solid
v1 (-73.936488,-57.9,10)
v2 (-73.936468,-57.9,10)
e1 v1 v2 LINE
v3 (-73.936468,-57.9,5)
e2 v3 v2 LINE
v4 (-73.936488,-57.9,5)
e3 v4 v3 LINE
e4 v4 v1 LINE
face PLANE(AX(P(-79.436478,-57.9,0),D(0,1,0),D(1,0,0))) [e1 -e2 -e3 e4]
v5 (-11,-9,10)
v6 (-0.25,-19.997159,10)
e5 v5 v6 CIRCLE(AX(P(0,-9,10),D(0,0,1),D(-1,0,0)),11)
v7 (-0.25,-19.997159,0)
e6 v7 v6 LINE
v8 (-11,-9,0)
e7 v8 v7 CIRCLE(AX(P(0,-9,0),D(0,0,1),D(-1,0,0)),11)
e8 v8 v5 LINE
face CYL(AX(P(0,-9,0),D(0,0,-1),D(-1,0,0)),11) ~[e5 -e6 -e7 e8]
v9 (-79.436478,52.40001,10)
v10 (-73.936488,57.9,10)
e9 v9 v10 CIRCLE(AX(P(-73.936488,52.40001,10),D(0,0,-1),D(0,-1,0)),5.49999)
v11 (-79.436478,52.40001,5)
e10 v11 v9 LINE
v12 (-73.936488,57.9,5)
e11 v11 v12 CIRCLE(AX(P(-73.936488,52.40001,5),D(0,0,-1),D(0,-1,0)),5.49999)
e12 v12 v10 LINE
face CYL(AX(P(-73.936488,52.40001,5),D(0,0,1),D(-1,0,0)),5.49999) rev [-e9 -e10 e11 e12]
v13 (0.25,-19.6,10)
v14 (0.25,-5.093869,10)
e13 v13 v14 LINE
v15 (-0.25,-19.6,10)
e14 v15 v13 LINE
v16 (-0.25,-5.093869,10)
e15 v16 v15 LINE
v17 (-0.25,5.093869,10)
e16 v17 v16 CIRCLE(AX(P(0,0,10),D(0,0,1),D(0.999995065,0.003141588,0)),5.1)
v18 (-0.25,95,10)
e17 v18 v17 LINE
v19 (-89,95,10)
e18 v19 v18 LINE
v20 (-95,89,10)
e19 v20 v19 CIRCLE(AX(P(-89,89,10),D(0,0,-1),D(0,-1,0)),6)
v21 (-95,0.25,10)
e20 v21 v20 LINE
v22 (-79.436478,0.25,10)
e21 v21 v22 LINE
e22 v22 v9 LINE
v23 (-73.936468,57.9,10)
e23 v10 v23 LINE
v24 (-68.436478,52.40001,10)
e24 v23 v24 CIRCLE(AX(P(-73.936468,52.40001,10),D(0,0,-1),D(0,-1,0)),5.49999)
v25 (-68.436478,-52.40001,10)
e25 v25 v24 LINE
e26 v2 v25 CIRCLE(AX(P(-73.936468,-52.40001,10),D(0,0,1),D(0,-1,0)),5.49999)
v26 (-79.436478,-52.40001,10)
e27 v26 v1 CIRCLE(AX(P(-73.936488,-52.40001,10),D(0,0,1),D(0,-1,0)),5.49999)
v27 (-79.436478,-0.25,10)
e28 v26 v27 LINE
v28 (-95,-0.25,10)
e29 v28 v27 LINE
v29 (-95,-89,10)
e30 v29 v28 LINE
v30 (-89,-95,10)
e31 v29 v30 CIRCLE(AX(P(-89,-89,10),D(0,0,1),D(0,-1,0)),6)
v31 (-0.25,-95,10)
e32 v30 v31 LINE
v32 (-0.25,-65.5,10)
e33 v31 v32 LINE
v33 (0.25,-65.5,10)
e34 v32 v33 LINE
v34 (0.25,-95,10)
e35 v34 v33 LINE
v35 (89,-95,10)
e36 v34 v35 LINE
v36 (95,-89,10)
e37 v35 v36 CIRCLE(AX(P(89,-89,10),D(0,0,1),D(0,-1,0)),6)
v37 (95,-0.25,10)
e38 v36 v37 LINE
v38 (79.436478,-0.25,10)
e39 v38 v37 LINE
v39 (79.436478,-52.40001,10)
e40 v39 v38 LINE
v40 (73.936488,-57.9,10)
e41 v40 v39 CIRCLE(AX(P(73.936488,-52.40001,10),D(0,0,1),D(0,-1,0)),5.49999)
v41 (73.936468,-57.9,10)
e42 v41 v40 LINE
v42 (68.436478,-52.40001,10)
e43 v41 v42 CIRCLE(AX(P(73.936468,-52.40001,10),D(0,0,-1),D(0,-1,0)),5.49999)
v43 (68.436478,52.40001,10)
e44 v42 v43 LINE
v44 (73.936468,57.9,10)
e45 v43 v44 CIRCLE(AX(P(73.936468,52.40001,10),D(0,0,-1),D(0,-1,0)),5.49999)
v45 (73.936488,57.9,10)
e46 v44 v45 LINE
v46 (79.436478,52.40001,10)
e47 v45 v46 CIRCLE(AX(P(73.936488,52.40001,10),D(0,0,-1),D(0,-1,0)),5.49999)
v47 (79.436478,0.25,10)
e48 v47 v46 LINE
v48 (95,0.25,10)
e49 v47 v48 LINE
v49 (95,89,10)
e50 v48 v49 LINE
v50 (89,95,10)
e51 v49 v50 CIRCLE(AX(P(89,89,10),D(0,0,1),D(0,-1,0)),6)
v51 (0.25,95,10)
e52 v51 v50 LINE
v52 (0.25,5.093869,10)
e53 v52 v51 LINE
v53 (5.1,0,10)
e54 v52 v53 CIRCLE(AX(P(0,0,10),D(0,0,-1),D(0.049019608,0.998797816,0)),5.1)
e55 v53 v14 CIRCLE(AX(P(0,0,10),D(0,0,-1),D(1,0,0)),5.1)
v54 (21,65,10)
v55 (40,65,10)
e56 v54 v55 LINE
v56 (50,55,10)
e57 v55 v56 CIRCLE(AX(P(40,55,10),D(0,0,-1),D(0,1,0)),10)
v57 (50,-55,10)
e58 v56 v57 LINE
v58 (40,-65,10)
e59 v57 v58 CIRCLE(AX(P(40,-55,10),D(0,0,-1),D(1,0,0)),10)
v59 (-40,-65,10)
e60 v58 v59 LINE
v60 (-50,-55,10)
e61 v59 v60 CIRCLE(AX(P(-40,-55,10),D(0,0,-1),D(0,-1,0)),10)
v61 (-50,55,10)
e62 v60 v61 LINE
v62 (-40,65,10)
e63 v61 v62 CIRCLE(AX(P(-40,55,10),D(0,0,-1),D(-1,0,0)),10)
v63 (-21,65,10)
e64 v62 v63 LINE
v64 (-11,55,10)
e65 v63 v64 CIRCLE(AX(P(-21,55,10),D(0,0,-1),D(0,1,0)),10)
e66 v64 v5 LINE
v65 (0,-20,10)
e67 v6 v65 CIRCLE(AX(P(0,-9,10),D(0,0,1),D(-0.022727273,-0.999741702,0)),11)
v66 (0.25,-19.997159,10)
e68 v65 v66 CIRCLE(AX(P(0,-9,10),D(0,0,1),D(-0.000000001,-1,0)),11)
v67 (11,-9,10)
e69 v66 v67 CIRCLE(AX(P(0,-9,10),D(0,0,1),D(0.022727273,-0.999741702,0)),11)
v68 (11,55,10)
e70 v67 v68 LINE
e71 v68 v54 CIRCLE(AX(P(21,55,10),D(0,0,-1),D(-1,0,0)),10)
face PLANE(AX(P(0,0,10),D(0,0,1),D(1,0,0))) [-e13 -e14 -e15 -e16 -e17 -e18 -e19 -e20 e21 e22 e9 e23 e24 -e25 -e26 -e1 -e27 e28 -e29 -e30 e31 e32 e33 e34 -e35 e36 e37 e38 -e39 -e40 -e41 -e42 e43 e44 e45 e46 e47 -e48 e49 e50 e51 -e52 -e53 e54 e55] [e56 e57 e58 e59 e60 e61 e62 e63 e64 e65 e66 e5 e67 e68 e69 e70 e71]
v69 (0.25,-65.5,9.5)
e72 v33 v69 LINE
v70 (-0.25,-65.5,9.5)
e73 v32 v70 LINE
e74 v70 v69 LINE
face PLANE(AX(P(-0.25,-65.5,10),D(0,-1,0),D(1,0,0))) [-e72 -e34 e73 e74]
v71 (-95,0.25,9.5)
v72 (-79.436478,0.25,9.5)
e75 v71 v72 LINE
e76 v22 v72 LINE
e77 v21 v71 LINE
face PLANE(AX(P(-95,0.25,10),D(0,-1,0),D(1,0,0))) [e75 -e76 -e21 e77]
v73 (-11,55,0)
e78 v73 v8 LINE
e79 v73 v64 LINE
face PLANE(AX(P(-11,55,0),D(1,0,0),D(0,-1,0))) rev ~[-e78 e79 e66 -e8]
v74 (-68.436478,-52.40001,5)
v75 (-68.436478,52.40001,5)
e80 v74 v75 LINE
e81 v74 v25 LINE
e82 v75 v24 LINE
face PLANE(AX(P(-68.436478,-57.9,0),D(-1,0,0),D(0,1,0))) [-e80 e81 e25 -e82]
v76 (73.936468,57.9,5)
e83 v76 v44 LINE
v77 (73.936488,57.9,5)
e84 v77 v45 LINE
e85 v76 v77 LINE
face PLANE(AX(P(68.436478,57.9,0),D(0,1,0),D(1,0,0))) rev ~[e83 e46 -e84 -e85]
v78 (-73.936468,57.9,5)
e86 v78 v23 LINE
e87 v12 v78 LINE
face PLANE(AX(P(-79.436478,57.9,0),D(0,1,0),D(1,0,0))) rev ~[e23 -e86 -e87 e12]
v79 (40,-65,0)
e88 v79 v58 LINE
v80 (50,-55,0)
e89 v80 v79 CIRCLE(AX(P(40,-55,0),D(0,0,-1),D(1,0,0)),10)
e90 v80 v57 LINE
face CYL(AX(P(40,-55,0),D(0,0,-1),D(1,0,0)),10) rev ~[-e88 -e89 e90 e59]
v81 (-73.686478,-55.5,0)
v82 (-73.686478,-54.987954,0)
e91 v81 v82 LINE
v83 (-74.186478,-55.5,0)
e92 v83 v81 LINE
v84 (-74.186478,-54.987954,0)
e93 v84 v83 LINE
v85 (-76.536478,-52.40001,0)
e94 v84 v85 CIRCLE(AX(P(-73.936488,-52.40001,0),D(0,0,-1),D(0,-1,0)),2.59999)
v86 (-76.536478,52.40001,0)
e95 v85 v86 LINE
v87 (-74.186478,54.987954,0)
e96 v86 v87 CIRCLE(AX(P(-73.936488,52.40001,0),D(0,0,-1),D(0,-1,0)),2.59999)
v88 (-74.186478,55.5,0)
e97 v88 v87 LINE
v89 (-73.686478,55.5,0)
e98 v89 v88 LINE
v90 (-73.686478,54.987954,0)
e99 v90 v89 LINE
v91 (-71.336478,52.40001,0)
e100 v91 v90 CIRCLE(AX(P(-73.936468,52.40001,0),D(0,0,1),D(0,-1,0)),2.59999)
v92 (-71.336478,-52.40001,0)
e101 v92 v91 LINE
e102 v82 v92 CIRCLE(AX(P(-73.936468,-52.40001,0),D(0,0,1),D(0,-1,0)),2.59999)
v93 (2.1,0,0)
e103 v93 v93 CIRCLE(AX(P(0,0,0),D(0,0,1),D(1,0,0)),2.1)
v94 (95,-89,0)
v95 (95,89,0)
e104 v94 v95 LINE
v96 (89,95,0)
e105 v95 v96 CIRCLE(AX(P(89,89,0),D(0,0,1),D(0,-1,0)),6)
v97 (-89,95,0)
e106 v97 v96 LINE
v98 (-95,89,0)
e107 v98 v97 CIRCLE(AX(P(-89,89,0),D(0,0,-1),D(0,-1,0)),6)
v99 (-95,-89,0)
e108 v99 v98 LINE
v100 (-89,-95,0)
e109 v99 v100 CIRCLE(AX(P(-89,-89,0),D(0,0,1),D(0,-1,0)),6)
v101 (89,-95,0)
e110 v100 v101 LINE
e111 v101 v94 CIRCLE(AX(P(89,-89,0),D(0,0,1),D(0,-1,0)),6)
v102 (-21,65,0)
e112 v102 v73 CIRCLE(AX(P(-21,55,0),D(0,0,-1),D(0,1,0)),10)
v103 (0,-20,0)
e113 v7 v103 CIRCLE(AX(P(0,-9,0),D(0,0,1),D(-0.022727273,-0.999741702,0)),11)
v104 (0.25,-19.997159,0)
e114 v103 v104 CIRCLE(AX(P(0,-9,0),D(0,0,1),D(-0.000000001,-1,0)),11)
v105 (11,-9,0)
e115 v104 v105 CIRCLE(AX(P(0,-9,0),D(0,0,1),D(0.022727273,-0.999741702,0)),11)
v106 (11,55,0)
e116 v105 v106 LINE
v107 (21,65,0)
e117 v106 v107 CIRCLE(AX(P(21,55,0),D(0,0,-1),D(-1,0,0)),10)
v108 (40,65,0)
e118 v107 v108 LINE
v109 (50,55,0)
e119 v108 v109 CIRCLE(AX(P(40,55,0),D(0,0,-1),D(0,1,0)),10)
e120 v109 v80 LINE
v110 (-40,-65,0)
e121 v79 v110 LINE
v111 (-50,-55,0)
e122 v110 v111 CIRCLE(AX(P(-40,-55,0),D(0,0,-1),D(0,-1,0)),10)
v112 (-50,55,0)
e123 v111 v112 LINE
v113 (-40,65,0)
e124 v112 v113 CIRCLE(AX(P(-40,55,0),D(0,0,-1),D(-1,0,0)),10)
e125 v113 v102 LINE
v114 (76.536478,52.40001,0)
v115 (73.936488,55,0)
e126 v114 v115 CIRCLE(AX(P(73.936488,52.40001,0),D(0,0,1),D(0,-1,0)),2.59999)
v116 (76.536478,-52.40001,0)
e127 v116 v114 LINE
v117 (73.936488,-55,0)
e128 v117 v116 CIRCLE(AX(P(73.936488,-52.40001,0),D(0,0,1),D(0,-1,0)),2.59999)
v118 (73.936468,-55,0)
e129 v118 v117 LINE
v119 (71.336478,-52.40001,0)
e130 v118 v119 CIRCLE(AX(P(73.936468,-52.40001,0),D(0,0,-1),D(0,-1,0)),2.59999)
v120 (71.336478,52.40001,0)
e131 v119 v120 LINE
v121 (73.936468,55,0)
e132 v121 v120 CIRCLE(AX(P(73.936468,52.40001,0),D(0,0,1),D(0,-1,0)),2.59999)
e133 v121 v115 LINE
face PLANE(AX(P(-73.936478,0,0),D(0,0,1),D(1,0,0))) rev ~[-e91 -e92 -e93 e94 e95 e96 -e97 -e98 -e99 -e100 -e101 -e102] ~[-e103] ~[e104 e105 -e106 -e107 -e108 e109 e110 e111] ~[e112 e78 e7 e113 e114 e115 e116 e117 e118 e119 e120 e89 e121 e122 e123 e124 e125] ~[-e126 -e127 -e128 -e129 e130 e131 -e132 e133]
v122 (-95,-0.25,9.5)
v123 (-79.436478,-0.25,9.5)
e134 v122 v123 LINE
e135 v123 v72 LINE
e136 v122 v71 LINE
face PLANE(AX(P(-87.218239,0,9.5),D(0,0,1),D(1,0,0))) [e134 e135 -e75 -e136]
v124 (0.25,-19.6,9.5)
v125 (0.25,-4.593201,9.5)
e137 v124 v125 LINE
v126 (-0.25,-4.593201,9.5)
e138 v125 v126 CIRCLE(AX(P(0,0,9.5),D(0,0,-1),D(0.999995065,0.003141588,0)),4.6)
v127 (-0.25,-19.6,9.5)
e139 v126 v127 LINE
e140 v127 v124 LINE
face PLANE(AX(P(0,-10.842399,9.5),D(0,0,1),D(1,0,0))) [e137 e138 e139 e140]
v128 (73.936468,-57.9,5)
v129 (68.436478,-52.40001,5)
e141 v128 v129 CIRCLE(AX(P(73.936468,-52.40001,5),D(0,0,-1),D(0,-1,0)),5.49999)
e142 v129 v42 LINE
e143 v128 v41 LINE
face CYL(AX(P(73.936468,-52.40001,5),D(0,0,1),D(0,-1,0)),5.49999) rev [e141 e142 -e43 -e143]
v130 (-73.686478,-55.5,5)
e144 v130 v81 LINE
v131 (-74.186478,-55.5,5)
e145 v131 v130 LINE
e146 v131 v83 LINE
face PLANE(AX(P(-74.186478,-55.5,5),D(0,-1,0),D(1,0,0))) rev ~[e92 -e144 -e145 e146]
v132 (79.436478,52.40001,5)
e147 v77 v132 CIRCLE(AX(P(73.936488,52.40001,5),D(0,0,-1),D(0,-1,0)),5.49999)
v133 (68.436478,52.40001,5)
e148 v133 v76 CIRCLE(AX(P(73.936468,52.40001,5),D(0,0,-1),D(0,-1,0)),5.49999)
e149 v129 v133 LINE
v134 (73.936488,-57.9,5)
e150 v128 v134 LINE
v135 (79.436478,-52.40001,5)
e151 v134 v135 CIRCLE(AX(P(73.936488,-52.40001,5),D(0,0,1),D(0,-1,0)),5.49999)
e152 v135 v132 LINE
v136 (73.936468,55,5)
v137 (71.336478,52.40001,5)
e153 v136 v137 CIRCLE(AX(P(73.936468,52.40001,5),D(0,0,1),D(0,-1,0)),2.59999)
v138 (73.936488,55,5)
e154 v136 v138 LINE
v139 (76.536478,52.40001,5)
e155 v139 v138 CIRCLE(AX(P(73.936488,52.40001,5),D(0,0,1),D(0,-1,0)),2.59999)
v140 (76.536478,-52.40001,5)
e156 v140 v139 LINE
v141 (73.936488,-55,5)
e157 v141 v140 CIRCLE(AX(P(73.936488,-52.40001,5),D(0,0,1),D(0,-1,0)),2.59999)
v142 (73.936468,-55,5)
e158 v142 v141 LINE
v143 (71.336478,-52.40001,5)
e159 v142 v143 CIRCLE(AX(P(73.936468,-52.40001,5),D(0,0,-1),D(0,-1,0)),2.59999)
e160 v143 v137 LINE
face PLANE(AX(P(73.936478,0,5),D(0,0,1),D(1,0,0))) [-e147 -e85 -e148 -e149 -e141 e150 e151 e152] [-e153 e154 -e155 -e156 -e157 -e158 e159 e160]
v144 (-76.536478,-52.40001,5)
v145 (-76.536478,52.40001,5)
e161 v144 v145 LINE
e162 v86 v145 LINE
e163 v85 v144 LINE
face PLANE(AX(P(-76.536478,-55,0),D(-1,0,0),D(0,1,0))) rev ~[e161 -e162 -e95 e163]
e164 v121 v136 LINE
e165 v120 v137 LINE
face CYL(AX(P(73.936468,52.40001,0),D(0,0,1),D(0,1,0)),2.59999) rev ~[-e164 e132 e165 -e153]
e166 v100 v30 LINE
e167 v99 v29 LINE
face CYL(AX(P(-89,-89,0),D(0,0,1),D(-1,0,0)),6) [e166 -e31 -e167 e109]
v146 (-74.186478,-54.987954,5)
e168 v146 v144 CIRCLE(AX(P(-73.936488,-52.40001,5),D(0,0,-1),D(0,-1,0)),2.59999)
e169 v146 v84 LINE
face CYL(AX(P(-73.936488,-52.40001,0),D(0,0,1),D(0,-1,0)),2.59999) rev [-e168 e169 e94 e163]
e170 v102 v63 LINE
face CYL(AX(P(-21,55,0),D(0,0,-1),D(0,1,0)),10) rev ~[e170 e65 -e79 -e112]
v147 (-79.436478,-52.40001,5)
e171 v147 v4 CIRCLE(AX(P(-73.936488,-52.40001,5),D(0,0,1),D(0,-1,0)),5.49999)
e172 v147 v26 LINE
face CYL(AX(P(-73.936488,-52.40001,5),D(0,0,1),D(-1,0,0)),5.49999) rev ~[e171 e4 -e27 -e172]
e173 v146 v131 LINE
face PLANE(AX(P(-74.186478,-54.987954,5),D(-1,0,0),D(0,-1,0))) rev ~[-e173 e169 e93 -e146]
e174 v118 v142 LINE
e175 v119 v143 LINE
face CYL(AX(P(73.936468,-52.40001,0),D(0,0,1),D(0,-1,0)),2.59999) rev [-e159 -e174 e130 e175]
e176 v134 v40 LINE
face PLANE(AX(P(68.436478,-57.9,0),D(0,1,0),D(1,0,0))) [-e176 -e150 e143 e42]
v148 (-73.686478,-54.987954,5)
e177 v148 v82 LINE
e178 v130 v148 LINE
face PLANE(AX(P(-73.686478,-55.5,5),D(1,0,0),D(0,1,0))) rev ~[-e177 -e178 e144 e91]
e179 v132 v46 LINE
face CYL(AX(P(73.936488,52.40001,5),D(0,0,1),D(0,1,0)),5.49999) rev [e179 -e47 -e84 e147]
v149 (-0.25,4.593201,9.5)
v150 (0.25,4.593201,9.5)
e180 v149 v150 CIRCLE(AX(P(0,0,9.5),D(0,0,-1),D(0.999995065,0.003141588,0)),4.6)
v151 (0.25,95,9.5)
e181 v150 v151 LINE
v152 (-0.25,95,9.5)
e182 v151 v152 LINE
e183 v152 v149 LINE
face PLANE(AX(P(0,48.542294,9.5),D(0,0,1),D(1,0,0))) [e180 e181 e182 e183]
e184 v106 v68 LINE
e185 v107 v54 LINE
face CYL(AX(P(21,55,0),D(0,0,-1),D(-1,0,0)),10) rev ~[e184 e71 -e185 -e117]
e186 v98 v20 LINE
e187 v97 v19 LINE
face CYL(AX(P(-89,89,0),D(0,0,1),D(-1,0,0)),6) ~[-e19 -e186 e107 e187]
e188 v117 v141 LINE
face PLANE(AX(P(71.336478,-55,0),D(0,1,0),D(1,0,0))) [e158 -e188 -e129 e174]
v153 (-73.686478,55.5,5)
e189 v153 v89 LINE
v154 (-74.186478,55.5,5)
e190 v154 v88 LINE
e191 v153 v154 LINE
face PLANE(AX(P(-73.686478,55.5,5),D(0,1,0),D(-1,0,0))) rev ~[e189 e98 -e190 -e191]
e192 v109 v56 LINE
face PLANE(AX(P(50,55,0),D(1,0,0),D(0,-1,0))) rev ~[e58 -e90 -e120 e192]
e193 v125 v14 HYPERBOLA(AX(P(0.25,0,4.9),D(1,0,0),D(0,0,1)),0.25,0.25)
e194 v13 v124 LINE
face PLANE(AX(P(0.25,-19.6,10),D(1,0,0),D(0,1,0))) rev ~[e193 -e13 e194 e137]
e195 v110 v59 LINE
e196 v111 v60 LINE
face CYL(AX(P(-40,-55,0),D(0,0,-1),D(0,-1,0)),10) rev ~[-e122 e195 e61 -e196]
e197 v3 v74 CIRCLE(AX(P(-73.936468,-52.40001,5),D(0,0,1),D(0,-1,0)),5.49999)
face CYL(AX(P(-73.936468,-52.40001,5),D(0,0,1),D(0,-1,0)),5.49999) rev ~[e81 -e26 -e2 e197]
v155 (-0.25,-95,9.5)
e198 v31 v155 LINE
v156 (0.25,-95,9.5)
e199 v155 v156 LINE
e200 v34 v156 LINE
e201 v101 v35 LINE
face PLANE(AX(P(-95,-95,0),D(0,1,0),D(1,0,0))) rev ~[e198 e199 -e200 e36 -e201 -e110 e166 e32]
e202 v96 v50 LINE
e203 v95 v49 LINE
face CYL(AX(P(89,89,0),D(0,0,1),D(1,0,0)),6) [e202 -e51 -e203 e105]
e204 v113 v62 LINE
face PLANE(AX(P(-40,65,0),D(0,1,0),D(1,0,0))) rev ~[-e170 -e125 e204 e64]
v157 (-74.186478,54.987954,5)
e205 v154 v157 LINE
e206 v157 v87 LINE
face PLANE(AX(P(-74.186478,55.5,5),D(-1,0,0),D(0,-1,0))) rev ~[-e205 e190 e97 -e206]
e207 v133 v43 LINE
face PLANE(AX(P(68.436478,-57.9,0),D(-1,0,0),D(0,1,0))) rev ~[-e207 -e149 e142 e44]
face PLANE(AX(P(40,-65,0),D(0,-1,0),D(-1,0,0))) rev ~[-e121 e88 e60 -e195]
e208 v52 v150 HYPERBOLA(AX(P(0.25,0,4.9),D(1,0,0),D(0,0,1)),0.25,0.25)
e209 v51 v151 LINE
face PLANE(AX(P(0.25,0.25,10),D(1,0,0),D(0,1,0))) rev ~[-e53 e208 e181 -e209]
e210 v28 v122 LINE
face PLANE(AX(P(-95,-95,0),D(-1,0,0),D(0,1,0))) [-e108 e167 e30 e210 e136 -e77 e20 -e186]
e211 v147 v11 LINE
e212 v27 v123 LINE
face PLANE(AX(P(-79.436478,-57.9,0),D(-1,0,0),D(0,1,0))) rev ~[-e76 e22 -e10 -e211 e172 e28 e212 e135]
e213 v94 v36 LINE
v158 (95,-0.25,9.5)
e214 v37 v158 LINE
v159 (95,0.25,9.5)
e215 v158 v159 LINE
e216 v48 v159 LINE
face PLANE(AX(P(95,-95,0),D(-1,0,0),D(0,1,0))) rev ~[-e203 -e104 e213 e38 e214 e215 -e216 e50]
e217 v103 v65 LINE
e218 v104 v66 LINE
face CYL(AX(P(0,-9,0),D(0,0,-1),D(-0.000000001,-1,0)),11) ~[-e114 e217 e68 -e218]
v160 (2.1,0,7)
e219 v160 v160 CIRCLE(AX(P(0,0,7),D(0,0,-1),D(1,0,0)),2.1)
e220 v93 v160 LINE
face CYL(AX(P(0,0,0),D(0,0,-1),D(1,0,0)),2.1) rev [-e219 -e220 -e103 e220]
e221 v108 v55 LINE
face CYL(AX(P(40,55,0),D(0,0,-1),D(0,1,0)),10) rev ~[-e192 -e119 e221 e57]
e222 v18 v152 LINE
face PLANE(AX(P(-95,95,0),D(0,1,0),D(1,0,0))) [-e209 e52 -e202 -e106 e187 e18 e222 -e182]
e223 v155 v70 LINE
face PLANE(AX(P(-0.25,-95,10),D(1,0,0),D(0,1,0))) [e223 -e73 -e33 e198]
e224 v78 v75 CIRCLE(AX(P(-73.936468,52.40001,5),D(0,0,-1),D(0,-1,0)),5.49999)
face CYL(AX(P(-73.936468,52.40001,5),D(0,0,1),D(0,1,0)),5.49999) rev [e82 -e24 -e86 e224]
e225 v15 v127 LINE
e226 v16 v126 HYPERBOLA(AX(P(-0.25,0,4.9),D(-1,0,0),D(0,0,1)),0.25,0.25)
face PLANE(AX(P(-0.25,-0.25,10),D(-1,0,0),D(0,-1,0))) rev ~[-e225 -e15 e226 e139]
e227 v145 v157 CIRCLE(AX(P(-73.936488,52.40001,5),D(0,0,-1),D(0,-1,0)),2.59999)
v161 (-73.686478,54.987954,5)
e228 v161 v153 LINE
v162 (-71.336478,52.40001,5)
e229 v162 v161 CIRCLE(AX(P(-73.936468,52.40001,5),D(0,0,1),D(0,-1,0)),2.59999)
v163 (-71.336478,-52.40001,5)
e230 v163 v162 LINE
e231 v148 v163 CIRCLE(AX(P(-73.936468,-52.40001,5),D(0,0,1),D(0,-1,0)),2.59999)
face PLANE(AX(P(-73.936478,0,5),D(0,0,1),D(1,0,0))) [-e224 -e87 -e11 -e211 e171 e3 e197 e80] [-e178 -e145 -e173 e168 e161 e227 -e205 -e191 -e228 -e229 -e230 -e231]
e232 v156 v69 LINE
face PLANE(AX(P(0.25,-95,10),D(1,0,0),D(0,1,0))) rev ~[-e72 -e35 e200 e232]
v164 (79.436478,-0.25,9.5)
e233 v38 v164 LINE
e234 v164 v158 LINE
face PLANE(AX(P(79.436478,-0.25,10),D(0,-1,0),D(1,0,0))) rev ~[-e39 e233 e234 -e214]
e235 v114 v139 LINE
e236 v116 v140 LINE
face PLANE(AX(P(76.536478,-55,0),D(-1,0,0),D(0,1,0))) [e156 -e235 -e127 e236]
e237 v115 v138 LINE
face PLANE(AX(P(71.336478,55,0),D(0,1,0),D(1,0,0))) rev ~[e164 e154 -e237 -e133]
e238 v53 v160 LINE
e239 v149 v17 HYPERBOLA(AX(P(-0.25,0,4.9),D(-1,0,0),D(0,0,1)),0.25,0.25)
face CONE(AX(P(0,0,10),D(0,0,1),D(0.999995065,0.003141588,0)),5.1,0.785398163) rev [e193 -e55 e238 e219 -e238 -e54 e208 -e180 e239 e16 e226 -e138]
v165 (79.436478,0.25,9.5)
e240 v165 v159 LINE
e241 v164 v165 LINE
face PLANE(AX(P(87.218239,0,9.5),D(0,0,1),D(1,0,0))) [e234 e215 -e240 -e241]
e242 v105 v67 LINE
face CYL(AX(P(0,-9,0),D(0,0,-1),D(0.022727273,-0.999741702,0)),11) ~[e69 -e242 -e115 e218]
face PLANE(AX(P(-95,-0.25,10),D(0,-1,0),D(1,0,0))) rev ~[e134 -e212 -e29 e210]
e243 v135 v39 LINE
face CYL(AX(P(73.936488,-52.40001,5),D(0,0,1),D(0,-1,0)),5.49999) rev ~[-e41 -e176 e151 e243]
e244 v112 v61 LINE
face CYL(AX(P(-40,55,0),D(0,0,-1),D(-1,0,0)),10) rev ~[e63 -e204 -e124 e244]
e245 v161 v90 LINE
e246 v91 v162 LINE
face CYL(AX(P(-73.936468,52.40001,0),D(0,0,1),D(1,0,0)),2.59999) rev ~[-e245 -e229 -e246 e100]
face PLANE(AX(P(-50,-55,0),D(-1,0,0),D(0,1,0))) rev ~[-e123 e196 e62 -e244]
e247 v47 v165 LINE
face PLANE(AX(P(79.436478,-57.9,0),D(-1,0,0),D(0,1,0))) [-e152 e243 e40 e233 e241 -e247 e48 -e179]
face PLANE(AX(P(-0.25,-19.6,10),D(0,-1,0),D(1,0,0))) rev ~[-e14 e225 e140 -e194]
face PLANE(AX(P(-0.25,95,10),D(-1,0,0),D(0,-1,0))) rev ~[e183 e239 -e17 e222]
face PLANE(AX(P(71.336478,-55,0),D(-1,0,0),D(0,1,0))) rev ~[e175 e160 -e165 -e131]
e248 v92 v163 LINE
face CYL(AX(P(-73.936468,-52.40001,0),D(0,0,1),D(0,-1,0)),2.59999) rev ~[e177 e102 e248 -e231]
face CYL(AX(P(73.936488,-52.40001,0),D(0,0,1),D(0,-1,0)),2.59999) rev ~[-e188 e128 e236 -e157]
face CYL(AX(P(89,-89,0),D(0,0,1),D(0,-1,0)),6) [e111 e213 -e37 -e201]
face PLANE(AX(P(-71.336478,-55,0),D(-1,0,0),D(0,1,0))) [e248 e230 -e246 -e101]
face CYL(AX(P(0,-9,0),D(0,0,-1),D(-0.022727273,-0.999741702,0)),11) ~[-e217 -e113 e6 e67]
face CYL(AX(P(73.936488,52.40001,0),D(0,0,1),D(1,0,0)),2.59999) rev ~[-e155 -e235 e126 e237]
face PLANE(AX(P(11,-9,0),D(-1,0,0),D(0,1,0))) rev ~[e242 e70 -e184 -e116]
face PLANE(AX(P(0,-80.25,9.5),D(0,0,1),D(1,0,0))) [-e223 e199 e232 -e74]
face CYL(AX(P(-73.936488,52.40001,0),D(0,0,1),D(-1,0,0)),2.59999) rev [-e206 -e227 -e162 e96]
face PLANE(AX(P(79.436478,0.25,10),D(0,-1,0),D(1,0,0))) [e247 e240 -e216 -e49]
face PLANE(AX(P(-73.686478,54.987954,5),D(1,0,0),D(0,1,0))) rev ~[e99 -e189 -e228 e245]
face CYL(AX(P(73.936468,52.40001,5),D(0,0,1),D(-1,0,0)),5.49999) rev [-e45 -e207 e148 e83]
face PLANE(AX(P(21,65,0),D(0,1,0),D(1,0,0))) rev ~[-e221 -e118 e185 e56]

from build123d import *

# Parameters (mm, degrees)
F0_W         = 190
F0_H         = 190
F0_W_2       = 11
F0_H_2       = 115.8
F0_R         = 2.1
F0_W_3       = 0.5
F0_H_3       = 0.5
F1_DEPTH     = 10
F0_W_4       = 5.2
F0_H_4       = 110
F2_DEPTH     = 5
F3_R         = 2.59999
F4_R         = 5.49999
F6_DEPTH     = 25
F8_R         = 6
F7_W         = 0.5
F7_H         = 29.5
F9_DEPTH     = 0.5
F7_W_2       = 15.563522011
F7_H_2       = 0.5
F10_DEPTH    = 0.5
F11_T2_ANGLE = 359.64
F11_T4_ANGLE = 293.7301704478
F11_T6_ANGLE = 293.7301704478


# Not quite as in the source:
# - a fillet or chamfer that OpenCascade refuses, or shapes differently, is made with other operations: its cross-section is extruded or revolved along the edge and cut away or added
# - a fillet or chamfer is up to 0.001 mm smaller than in the source, because OpenCascade refuses the exact size
# - ends of sketch curves that miss each other by under 0.0002 mm in the source are joined


with BuildPart() as f1:
    # F0 (on Top) → F1 (new body)
    with BuildSketch(Plane.XY):
        Rectangle(F0_W, F0_H)
        with BuildLine():
            ThreePointArc((50, -55), (47.0710678119, -62.0710678119), (40, -65))
            Line((40, -65), (0.25, -65))
            Line((0.25, -65), (0.25, -65.5))
            Line((0.25, -65.5), (-0.25, -65.5))
            Line((-0.25, -65.5), (-0.25, -65))
            Line((-0.25, -65), (-40, -65))
            ThreePointArc((-40, -65), (-47.0710678119, -62.0710678119), (-50, -55))
            Line((-50, -55), (-50, 55))
            ThreePointArc((-50, 55), (-47.0710678119, 62.0710678119), (-40, 65))
            Line((-40, 65), (-21, 65))
            ThreePointArc((-21, 65), (-13.9289321881, 62.0710678119), (-11, 55))
            Line((-11, 55), (-11, -9))
            ThreePointArc((-11, -9), (-7.8660663613, -16.6892782496), (-0.25, -19.997158724))
            Line((-0.25, -19.997158724), (-0.25, -19.5))
            Line((-0.25, -19.5), (0.25, -19.5))
            Line((0.25, -19.5), (0.25, -19.997158724))
            ThreePointArc((0.25, -19.997158724), (7.8660663613, -16.6892782496), (11, -9))
            Line((11, -9), (11, 55))
            ThreePointArc((11, 55), (13.9289321881, 62.0710678119), (21, 65))
            Line((21, 65), (40, 65))
            ThreePointArc((40, 65), (47.0710678119, 62.0710678119), (50, 55))
            Line((50, 55), (50, -55))
        make_face(mode=Mode.SUBTRACT)
        with Locations((-73.936477989, 0)):
            Rectangle(F0_W_2, F0_H_2, mode=Mode.SUBTRACT)
        Circle(F0_R, mode=Mode.SUBTRACT)
        with Locations((73.936477989, 0)):
            Rectangle(F0_W_2, F0_H_2, mode=Mode.SUBTRACT)
        with BuildLine():
            ThreePointArc((0, -20), (0.1250080726, -19.9992896581), (0.25, -19.997158724))
            Line((0.25, -19.997158724), (0.25, -19.5))
            Line((0.25, -19.5), (-0.25, -19.5))
            Line((-0.25, -19.5), (-0.25, -19.997158724))
            ThreePointArc((-0.25, -19.997158724), (-0.1250080726, -19.9992896581), (0, -20))
        make_face()
        with Locations((0, -65.25)):
            Rectangle(F0_W_3, F0_H_3)
    extrude(amount=F1_DEPTH)

    # F0 (on Top) → F2 (join)
    with BuildSketch(Plane.XY):
        with Locations((-73.936477989, 0)):
            Rectangle(F0_W_2, F0_H_2)
        with Locations((-73.936477989, 0)):
            Rectangle(F0_W_4, F0_H_4, mode=Mode.SUBTRACT)
        with Locations((73.936477989, 0)):
            Rectangle(F0_W_2, F0_H_2)
        with Locations((73.936477989, 0)):
            Rectangle(F0_W_4, F0_H_4, mode=Mode.SUBTRACT)
    extrude(amount=F2_DEPTH)

    # F3 (radius 2.6 in the source; OpenCascade refuses exactly that, so slightly less here)
    f3_edges = [f1.edges().sort_by_distance(p)[0] for p in [
        (-76.536478, 55, 2.5),
        (-71.336478, 55, 2.5),
        (-76.536478, -55, 2.5),
        (-71.336478, -55, 2.5),
        (76.536478, -55, 2.5),
        (71.336478, -55, 2.5),
        (71.336478, 55, 2.5),
        (76.536478, 55, 2.5),
    ]]
    fillet(f3_edges, radius=F3_R)

    # F4 (radius 5.5 in the source; OpenCascade refuses exactly that, so slightly less here)
    f4_edges = [f1.edges().sort_by_distance(p)[0] for p in [
        (-79.436478, 57.9, 7.5),
        (-68.436478, 57.9, 7.5),
        (79.436478, 57.9, 7.5),
        (68.436478, 57.9, 7.5),
        (68.436478, -57.9, 7.5),
        (79.436478, -57.9, 7.5),
        (-79.436478, -57.9, 7.5),
        (-68.436478, -57.9, 7.5),
    ]]
    fillet(f4_edges, radius=F4_R)

    # F5 (on face) → F6 (cut)
    with BuildSketch(Plane.XY.offset(5)):
        with BuildLine():
            Line((-73.686477989, -55.5), (-73.686477989, -54.9879537784))
            ThreePointArc((-73.686477989, -54.9879537784), (-73.8113279558, -54.9969866984), (-73.936467989, -55))
            ThreePointArc((-73.936467989, -55), (-74.0616280221, -54.9969866984), (-74.186477989, -54.9879537784))
            Line((-74.186477989, -54.9879537784), (-74.186477989, -55.5))
            Line((-74.186477989, -55.5), (-73.686477989, -55.5))
        make_face()
        with BuildLine():
            ThreePointArc((-73.936467989, 55), (-73.8113279558, 54.9969866984), (-73.686477989, 54.9879537784))
            Line((-73.686477989, 54.9879537784), (-73.686477989, 55.5))
            Line((-73.686477989, 55.5), (-74.186477989, 55.5))
            Line((-74.186477989, 55.5), (-74.186477989, 54.9879537784))
            ThreePointArc((-74.186477989, 54.9879537784), (-74.0616280221, 54.9969866984), (-73.936467989, 55))
        make_face()
    extrude(amount=-F6_DEPTH, mode=Mode.SUBTRACT)

    # F8
    f8_edges = [f1.edges().sort_by_distance(p)[0] for p in [
        (-95, -95, 5),
        (95, -95, 5),
        (95, 95, 5),
        (-95, 95, 5),
    ]]
    fillet(f8_edges, radius=F8_R)

    # F7 (on face) → F9 (cut)
    with BuildSketch(Plane.XY.offset(10)):
        with BuildLine():
            Line((-0.25, 95), (-0.25, 2.0850659462))
            ThreePointArc((-0.25, 2.0850659462), (0, 2.1), (0.25, 2.0850659462))
            Line((0.25, 2.0850659462), (0.25, 95))
            Line((0.25, 95), (-0.25, 95))
        make_face()
        with BuildLine():
            Line((-0.25, -2.0850659462), (-0.25, -19.6))
            Line((-0.25, -19.6), (0.25, -19.6))
            Line((0.25, -19.6), (0.25, -2.0850659462))
            ThreePointArc((0.25, -2.0850659462), (0, -2.1), (-0.25, -2.0850659462))
        make_face()
        with Locations((0, -80.25)):
            Rectangle(F7_W, F7_H)
        with BuildLine():
            Line((-0.25, -0.25), (-0.25, -2.0850659462))
            ThreePointArc((-0.25, -2.0850659462), (0, -2.1), (0.25, -2.0850659462))
            Line((0.25, -2.0850659462), (0.25, -0.25))
            Line((0.25, -0.25), (-0.25, -0.25))
        make_face()
        with BuildLine():
            Line((-0.25, 2.0850659462), (-0.25, 0.25))
            Line((-0.25, 0.25), (0.25, 0.25))
            Line((0.25, 0.25), (0.25, 2.0850659462))
            ThreePointArc((0.25, 2.0850659462), (0, 2.1), (-0.25, 2.0850659462))
        make_face()
    extrude(amount=-F9_DEPTH, mode=Mode.SUBTRACT)

    # F7 (on face) → F10 (cut)
    with BuildSketch(Plane.XY.offset(10)):
        with Locations((87.2182389945, 0)):
            Rectangle(F7_W_2, F7_H_2)
        with Locations((-87.2182389945, 0)):
            Rectangle(F7_W_2, F7_H_2)
    extrude(amount=-F10_DEPTH, mode=Mode.SUBTRACT)

    # F11: chamfer of 3 on 3 edges, made by hand

    # F11_s1 → F11_t2 (revolve, cut)
    with BuildSketch(Plane(origin=(0, 0, 0), x_dir=(0, 0, 1), z_dir=(0.0031415875, -0.9999950652, 0))):
        Polygon((10, -5.1), (7, -2.1), (10, -2.1), align=None)
    revolve(axis=Axis((0, 0, 10), (0, 0, 1)), revolution_arc=F11_T2_ANGLE, mode=Mode.SUBTRACT)

    # F11_s3 → F11_t4 (revolve, cut)
    with BuildSketch(Plane(origin=(0, 0, 0), x_dir=(0, 0, 1), z_dir=(0.9154508113, -0.4024298847, 0))):
        Polygon((10, -5.1), (7, -2.1), (10, -2.1), align=None)
    revolve(axis=Axis((0, 0, 10), (0, 0, 1)), revolution_arc=F11_T4_ANGLE, mode=Mode.SUBTRACT)

    # F11_s5 → F11_t6 (revolve, cut)
    with BuildSketch(Plane.XZ):
        Polygon((5.1, 10), (2.1, 7), (2.1, 10), align=None)
    revolve(axis=Axis((0, 0, 10), (0, 0, 1)), revolution_arc=F11_T6_ANGLE, mode=Mode.SUBTRACT)


solid = f1.part
